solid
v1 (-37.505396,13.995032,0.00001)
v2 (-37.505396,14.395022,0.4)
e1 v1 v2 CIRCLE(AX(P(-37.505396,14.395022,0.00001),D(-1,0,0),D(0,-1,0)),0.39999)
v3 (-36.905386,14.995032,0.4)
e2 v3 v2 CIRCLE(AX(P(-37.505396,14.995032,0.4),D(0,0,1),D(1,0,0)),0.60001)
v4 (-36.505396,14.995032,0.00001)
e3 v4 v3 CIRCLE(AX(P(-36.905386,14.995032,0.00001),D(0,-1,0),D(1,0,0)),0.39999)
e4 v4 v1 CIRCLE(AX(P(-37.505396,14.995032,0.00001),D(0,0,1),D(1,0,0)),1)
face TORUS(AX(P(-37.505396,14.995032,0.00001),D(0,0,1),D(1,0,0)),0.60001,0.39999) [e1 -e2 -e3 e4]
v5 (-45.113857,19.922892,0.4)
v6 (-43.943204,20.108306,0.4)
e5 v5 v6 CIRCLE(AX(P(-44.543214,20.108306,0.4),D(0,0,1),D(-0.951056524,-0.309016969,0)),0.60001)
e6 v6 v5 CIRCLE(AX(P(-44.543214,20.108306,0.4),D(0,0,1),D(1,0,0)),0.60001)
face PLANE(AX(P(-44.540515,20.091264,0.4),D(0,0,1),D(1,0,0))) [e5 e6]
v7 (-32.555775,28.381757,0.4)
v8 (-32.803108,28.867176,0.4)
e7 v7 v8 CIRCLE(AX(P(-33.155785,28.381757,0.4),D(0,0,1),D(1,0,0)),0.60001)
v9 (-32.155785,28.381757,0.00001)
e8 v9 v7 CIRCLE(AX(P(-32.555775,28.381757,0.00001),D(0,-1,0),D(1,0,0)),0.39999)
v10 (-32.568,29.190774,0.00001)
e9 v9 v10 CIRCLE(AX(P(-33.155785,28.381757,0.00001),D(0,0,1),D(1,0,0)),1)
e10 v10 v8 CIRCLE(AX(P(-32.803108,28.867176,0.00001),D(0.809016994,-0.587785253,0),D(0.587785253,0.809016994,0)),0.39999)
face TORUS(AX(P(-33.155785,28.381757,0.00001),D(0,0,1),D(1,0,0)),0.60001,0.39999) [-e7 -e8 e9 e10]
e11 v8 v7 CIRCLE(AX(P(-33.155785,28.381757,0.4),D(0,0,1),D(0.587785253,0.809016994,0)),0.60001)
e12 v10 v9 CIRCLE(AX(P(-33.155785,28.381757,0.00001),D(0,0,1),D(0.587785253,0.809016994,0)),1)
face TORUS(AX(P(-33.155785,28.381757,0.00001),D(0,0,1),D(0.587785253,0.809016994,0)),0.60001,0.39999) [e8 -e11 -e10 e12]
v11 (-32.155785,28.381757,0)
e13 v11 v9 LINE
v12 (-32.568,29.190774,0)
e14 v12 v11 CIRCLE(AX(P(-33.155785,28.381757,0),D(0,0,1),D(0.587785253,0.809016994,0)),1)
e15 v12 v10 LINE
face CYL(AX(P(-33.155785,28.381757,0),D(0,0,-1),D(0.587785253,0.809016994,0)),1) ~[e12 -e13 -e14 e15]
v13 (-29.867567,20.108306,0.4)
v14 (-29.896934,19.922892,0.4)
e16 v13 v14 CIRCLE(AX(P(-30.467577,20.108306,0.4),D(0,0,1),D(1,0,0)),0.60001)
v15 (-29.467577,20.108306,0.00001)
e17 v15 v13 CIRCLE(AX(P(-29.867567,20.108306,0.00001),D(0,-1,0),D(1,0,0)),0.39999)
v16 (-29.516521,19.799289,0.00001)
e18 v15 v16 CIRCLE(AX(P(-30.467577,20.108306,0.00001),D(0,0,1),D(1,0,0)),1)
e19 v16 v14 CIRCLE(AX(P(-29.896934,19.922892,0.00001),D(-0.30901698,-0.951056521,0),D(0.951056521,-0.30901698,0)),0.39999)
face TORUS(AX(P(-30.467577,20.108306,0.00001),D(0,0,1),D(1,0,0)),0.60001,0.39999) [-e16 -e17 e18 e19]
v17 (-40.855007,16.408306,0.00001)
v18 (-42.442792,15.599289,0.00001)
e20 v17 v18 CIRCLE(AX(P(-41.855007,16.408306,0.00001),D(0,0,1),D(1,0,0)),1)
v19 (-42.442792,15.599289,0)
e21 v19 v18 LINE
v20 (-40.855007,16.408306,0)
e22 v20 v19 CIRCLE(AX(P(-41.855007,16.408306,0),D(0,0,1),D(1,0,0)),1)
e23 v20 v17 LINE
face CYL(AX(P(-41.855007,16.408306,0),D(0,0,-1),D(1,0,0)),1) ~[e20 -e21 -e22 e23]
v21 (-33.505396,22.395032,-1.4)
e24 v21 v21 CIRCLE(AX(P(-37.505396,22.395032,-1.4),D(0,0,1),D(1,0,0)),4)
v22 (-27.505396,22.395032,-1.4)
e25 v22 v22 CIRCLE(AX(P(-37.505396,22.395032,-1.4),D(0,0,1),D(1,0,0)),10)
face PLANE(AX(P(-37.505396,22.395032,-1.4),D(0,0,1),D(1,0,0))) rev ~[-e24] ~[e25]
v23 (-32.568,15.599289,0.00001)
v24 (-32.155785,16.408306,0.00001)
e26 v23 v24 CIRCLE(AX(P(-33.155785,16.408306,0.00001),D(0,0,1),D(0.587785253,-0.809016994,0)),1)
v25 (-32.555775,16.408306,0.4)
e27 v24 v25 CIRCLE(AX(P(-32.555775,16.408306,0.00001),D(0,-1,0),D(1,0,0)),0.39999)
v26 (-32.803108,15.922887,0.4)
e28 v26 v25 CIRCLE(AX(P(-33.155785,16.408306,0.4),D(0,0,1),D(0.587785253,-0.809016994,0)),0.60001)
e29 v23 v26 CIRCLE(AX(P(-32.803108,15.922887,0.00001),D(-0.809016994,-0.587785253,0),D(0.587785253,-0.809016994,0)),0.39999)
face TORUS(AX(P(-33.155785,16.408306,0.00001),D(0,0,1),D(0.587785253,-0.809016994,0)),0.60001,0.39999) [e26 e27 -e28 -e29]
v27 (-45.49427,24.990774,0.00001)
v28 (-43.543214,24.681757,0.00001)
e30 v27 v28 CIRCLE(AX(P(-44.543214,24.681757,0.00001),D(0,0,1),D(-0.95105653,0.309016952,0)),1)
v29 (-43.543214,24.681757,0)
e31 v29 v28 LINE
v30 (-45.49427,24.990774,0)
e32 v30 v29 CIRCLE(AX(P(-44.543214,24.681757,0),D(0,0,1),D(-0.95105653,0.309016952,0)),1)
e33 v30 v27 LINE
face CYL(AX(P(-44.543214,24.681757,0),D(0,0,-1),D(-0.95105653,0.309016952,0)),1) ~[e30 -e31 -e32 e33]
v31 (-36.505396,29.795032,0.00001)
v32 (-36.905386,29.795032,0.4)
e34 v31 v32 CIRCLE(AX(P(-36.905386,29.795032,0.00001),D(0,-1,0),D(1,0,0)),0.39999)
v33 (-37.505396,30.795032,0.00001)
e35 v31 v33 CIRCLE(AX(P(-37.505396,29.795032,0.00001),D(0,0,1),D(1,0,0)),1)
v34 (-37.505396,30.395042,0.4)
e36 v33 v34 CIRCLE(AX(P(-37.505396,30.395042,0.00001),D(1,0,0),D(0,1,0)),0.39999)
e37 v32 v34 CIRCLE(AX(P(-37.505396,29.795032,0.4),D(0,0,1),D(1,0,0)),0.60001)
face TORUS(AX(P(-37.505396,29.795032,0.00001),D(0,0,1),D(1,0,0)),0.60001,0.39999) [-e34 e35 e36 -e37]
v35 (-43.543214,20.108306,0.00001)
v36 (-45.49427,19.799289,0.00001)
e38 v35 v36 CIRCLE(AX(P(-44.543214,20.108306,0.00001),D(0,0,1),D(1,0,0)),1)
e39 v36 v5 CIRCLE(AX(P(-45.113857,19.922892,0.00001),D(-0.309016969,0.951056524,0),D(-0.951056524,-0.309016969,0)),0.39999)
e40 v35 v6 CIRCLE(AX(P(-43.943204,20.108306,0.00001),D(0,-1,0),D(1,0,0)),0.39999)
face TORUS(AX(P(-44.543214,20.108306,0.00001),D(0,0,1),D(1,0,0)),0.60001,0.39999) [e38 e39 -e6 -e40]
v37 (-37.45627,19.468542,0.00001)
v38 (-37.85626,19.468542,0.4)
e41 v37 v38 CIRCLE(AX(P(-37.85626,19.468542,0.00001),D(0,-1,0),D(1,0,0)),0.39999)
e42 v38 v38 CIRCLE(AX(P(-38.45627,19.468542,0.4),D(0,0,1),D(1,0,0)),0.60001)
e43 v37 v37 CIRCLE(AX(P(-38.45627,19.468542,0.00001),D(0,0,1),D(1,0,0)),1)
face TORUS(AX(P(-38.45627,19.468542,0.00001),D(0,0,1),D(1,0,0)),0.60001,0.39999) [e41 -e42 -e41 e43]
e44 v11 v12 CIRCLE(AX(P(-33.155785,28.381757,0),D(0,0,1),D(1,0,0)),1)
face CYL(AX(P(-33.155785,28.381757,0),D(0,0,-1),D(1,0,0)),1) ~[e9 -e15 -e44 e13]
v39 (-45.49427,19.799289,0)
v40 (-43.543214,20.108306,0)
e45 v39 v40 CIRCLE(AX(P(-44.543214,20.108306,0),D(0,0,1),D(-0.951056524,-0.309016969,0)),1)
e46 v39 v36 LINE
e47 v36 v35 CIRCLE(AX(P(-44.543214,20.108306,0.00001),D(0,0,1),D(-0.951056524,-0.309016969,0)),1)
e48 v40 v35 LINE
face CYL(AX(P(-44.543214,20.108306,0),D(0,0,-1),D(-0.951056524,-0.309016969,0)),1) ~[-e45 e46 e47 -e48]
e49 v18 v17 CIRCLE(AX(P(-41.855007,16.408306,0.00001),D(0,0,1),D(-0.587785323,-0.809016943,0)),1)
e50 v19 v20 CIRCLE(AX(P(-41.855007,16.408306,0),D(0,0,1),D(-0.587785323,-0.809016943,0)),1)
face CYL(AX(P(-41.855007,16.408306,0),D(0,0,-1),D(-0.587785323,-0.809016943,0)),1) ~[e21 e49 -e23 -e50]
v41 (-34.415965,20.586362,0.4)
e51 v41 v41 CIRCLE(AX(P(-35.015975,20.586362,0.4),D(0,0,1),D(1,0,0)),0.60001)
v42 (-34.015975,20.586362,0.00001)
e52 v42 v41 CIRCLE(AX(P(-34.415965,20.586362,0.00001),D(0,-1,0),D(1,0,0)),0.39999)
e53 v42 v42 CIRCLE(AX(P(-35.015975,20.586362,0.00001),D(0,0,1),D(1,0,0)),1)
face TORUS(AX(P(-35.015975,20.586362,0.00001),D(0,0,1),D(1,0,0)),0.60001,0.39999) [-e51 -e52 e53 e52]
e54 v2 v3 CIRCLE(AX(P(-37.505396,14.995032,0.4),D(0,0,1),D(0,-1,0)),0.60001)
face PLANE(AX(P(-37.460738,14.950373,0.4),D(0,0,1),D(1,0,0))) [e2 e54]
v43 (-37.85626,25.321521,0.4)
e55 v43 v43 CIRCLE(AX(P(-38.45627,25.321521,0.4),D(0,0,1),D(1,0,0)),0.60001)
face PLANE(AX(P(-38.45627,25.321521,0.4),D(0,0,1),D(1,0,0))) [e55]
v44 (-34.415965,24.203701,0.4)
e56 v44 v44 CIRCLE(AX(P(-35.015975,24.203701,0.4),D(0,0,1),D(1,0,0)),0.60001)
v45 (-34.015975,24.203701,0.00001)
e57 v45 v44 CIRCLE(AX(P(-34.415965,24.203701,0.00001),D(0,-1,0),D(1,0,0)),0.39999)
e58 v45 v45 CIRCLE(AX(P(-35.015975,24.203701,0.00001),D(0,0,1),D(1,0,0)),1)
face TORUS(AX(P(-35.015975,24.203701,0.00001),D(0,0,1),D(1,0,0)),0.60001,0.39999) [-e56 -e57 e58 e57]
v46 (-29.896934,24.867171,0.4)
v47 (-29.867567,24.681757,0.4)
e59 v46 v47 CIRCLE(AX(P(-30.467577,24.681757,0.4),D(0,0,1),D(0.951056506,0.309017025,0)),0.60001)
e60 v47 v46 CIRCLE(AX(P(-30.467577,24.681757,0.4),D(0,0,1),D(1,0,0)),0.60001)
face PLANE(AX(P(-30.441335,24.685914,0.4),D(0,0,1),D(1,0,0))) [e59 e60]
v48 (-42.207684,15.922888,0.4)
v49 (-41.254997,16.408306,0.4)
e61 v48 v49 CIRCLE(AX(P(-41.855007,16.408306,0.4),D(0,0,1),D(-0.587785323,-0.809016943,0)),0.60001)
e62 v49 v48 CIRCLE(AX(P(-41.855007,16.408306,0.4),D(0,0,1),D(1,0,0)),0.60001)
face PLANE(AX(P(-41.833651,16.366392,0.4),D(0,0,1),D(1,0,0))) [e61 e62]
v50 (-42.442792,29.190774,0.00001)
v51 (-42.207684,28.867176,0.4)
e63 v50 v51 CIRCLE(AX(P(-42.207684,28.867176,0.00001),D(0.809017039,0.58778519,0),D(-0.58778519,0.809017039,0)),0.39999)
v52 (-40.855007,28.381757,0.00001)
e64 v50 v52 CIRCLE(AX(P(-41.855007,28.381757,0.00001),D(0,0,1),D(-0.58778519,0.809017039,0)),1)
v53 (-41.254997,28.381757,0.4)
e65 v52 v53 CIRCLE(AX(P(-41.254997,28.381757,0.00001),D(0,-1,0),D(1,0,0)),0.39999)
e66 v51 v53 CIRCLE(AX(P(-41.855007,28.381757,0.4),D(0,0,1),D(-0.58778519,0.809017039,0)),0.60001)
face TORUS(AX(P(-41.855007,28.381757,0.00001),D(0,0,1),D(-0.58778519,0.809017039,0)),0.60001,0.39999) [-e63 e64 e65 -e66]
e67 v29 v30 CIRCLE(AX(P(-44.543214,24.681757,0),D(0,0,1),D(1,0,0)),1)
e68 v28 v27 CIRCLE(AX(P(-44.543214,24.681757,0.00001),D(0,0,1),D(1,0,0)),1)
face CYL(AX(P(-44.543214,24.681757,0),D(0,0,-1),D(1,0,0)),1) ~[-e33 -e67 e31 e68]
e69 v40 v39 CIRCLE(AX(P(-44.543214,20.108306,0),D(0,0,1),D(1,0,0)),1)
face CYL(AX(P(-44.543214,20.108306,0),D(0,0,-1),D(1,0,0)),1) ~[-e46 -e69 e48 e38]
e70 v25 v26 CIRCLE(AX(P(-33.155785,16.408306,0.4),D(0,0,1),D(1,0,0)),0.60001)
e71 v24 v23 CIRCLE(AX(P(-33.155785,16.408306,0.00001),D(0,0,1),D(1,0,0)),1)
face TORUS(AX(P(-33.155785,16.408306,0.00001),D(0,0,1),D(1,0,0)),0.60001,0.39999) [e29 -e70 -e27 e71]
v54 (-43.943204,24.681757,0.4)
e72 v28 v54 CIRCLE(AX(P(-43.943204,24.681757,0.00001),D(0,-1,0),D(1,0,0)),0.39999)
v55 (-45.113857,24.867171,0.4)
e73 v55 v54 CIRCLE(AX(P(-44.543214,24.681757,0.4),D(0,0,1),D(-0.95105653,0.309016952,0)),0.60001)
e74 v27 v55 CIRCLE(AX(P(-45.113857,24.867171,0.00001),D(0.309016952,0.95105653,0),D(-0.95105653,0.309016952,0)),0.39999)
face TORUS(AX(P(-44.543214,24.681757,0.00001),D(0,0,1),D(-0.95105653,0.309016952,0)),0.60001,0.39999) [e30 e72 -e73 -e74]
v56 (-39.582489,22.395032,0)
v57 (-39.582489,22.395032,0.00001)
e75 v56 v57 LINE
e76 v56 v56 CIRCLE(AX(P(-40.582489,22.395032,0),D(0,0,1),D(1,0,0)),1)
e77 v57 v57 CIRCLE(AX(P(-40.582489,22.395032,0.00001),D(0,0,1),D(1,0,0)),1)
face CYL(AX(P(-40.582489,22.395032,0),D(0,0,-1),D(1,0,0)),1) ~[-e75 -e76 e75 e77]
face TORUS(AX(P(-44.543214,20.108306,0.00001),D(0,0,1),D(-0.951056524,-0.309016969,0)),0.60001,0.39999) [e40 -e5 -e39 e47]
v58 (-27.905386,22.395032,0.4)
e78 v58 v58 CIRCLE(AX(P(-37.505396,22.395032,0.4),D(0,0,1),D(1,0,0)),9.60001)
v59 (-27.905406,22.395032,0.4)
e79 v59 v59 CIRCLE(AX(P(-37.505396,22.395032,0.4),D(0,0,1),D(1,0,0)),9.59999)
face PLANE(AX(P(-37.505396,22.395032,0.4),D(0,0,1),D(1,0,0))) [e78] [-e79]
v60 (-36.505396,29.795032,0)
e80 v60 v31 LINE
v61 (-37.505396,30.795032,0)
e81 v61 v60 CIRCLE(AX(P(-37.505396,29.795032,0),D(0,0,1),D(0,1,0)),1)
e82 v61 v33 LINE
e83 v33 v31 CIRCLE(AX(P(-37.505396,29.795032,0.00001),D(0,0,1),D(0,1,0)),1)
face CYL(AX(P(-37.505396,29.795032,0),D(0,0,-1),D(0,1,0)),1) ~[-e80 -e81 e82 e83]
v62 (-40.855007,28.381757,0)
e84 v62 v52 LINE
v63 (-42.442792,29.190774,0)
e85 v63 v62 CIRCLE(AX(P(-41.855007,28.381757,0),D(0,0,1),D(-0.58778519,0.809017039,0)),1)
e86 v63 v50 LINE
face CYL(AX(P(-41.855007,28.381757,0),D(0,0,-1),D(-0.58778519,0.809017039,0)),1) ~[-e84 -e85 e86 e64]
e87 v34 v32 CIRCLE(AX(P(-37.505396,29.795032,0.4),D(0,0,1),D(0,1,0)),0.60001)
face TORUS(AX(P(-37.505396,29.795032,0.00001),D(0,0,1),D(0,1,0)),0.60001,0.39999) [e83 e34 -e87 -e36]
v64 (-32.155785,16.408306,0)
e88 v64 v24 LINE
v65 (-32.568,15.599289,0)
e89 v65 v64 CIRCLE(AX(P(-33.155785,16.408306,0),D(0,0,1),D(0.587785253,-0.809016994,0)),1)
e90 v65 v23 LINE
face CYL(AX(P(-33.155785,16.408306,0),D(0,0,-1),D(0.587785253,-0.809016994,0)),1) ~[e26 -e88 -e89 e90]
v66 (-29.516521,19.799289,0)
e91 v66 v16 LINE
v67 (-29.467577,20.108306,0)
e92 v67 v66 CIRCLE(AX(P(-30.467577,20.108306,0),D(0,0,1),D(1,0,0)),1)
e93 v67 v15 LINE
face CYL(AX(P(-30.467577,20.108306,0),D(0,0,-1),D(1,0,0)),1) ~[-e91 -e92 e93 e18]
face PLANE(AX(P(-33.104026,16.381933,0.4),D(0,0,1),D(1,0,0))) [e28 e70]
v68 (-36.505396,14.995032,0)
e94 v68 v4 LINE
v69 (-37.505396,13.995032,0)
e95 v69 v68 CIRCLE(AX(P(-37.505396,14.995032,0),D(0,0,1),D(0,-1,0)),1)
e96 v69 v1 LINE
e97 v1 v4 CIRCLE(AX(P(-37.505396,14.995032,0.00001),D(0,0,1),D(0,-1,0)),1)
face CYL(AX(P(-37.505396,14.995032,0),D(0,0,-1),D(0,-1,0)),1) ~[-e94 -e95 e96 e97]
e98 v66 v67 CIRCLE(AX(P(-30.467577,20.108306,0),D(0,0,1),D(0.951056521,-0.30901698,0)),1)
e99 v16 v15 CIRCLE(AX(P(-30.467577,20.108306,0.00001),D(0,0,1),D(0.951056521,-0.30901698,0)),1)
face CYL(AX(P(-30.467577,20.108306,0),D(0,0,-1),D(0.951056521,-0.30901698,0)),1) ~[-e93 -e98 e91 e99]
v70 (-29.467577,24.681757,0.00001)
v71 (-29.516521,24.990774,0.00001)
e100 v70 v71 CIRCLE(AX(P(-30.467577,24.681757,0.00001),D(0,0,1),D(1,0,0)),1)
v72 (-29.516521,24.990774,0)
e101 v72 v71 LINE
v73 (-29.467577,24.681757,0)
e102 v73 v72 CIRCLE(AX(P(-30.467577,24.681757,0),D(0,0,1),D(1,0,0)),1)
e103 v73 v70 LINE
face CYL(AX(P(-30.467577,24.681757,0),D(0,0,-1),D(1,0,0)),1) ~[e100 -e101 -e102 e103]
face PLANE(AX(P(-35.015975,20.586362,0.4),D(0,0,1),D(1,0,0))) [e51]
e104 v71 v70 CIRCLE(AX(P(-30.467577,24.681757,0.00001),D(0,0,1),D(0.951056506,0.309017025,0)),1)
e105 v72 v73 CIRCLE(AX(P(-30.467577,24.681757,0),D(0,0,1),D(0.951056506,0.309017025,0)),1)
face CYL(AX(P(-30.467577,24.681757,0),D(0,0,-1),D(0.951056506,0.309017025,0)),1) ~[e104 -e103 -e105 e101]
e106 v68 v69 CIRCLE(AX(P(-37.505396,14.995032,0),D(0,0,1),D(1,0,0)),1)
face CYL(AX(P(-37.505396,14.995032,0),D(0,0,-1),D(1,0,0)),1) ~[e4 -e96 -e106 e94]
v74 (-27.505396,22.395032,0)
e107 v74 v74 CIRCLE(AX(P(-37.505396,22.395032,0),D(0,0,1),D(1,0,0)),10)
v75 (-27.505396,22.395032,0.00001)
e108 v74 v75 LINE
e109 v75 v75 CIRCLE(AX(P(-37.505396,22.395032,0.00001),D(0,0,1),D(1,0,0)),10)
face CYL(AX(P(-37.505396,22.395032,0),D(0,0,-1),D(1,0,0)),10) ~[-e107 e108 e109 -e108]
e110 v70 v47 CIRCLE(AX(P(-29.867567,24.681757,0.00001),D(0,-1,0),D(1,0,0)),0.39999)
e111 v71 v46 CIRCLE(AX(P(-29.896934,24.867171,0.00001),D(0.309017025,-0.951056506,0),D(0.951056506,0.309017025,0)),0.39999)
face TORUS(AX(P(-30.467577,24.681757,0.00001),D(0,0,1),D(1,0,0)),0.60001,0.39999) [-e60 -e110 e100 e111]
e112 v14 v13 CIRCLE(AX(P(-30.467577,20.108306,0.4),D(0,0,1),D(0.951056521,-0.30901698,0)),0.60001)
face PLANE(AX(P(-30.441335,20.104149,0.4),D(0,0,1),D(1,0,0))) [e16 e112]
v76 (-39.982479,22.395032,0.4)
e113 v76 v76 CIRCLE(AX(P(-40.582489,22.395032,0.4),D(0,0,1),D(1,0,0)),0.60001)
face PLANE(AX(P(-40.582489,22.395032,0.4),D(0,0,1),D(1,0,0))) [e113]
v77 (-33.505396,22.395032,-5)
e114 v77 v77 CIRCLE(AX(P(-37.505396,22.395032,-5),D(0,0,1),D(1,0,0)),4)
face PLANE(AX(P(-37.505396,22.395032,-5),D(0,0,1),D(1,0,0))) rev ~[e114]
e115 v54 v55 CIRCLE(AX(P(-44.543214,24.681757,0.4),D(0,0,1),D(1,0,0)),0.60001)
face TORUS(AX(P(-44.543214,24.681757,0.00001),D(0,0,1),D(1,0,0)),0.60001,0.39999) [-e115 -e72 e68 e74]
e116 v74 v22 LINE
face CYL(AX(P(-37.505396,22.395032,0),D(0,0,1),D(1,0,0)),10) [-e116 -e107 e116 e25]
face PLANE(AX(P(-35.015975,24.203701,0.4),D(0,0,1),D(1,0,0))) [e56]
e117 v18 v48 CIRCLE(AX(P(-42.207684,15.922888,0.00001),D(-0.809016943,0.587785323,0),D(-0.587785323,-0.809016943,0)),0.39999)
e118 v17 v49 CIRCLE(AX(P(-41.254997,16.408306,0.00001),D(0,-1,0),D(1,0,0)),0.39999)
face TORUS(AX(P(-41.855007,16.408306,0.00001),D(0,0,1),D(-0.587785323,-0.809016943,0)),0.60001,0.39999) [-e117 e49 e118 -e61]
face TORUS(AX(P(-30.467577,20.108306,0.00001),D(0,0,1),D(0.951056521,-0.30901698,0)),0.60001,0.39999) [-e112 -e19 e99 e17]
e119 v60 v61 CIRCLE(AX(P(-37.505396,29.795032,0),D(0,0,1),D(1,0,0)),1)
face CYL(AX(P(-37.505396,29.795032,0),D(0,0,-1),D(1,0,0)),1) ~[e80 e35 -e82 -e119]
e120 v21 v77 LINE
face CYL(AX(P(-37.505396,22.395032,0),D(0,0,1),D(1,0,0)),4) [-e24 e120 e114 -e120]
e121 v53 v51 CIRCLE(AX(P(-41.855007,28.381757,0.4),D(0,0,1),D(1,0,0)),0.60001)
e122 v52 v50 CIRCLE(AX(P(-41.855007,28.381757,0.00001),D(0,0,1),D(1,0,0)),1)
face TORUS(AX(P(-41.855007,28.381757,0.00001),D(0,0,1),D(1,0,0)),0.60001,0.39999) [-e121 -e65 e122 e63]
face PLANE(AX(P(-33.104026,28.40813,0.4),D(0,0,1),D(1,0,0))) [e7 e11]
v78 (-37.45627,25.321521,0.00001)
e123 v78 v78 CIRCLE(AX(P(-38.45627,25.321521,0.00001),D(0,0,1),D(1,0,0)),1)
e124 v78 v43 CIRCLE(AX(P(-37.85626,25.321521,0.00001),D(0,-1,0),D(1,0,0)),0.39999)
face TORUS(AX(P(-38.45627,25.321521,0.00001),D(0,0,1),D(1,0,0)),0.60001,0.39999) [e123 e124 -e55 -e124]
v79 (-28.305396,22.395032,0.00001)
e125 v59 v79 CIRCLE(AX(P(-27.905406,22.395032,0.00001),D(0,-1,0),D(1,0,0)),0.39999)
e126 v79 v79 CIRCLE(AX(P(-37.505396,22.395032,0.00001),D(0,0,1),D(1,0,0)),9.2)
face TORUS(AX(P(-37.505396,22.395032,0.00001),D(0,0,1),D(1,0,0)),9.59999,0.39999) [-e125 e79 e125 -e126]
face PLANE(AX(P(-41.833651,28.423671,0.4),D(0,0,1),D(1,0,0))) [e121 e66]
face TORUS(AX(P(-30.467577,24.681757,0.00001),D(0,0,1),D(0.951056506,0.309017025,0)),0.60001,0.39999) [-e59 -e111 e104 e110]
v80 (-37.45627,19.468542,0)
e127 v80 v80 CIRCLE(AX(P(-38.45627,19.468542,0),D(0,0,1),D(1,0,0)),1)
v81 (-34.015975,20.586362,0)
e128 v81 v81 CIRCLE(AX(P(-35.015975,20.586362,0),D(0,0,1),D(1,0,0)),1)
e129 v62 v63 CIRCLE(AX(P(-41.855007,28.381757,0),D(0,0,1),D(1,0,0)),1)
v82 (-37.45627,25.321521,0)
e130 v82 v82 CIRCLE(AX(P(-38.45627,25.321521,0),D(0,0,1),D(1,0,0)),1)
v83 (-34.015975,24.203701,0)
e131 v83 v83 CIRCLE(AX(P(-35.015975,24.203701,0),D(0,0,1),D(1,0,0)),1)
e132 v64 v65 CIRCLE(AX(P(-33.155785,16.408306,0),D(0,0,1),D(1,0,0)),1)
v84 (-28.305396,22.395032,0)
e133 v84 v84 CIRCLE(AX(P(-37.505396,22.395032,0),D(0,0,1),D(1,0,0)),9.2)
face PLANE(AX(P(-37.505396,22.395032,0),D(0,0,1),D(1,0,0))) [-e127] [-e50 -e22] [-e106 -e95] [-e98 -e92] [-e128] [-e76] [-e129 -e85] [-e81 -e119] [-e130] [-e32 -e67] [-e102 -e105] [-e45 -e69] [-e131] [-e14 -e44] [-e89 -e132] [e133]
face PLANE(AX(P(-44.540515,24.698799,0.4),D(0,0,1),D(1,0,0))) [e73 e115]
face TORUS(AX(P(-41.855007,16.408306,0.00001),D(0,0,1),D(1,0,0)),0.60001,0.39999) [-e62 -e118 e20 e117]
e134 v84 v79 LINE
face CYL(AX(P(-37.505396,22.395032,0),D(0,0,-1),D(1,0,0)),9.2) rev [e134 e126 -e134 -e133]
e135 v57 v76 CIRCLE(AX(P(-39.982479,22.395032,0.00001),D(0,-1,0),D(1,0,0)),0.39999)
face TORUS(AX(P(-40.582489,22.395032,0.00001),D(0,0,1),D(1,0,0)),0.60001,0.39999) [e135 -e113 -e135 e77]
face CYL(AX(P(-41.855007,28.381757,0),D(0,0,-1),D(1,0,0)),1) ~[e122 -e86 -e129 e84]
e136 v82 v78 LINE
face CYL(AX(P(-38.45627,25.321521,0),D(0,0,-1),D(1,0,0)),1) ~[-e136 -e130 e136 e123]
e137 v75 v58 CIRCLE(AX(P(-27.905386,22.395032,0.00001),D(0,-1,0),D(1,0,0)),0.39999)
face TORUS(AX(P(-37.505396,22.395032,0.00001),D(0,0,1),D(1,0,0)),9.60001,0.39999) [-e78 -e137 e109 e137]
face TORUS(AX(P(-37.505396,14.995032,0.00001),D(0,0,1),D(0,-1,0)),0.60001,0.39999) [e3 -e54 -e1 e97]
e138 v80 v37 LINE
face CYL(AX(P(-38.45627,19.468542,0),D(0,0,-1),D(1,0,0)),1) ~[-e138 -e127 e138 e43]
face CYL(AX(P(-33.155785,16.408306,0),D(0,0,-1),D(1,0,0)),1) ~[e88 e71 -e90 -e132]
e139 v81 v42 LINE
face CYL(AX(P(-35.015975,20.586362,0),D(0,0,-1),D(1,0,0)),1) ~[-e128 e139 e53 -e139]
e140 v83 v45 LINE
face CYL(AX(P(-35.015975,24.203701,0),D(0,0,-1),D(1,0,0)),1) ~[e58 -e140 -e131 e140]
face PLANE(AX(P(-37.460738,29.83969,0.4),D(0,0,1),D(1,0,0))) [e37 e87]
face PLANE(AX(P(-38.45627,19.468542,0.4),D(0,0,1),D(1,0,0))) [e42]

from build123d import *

# Parameters (mm, degrees)
F0_R     = 10
F0_R_2   = 4
F1_DEPTH = 1.4
F2_DEPTH = 5
F3_R     = 10
F3_R_2   = 9.2
F3_R_3   = 1
F4_DEPTH = 0.4
F5_R     = 0.39999


# Not quite as in the source:
# - a fillet or chamfer is up to 0.001 mm smaller than in the source, because OpenCascade refuses the exact size


with BuildPart() as f1:
    # F0 (on Top) → F1 (new body)
    with BuildSketch(Plane.XY):
        with Locations((-37.5053957105, 22.3950315267)):
            Circle(F0_R)
        with Locations((-37.5053957105, 22.3950315267)):
            Circle(F0_R_2, mode=Mode.SUBTRACT)
        with Locations((-37.5053957105, 22.3950315267)):
            Circle(F0_R_2)
    extrude(amount=-F1_DEPTH)

    # F0 (on Top) → F2 (join)
    with BuildSketch(Plane.XY):
        with Locations((-37.5053957105, 22.3950315267)):
            Circle(F0_R_2)
    extrude(amount=-F2_DEPTH)

    # F3 (on face) → F4 (join)
    with BuildSketch(Plane.XY):
        with Locations((-37.5053957105, 22.3950315267)):
            Circle(F3_R)
        with Locations((-37.5053957105, 22.3950315267)):
            Circle(F3_R_2, mode=Mode.SUBTRACT)
        with BuildLine():
            ThreePointArc((-43.5432139311, 24.6817572851), (-44.3867794879, 25.6694456291), (-45.4942704611, 24.9907742372))
            ThreePointArc((-45.4942704611, 24.9907742372), (-44.6996483742, 23.694068941), (-43.5432139311, 24.6817572851))
        make_face()
        with BuildLine():
            ThreePointArc((-43.5432139311, 20.1083057683), (-44.6996483831, 21.095994111), (-45.4942704555, 19.799288799))
            ThreePointArc((-45.4942704555, 19.799288799), (-44.386779479, 19.1206174257), (-43.5432139311, 20.1083057683))
        make_face()
        with BuildLine():
            ThreePointArc((-40.8550065774, 16.4083057683), (-42.3089970383, 17.2993123123), (-42.4427919004, 15.5992888253))
            ThreePointArc((-42.4427919004, 15.5992888253), (-41.4010161166, 15.5172992243), (-40.8550065774, 16.4083057683))
        make_face()
        with BuildLine():
            ThreePointArc((-37.5053957105, 30.7950315267), (-38.2125024917, 29.0879247455), (-36.5053957105, 29.7950315267))
            ThreePointArc((-36.5053957105, 29.7950315267), (-36.7982889293, 30.5021383079), (-37.5053957105, 30.7950315267))
        make_face()
        with BuildLine():
            ThreePointArc((-40.8550065774, 28.3817572851), (-41.4010160436, 29.2727637919), (-42.4427917678, 29.1907743244))
            ThreePointArc((-42.4427917678, 29.1907743244), (-42.3089971113, 27.4907507782), (-40.8550065774, 28.3817572851))
        make_face()
        with BuildLine():
            ThreePointArc((-36.5053957105, 14.9950315267), (-38.2125024917, 15.7021383079), (-37.5053957105, 13.9950315267))
            ThreePointArc((-37.5053957105, 13.9950315267), (-36.7982889293, 14.2879247455), (-36.5053957105, 14.9950315267))
        make_face()
        with BuildLine():
            ThreePointArc((-32.1557848435, 16.4083057683), (-34.0467913678, 16.8622962678), (-32.5679995907, 15.5992887743))
            ThreePointArc((-32.5679995907, 15.5992887743), (-32.2647783192, 15.9543152688), (-32.1557848435, 16.4083057683))
        make_face()
        with BuildLine():
            ThreePointArc((-29.4675774899, 20.1083057683), (-31.4552658317, 20.2647402258), (-29.5165209689, 19.7992887885))
            ThreePointArc((-29.5165209689, 19.7992887885), (-29.4798891481, 19.9518713108), (-29.4675774899, 20.1083057683))
        make_face()
        with BuildLine():
            ThreePointArc((-29.4675774899, 24.6817572851), (-29.4798891518, 24.8381917658), (-29.5165209834, 24.9907743097))
            ThreePointArc((-29.5165209834, 24.9907743097), (-31.455265828, 24.5253228043), (-29.4675774899, 24.6817572851))
        make_face()
        with BuildLine():
            ThreePointArc((-32.1557848435, 28.3817572851), (-32.2647783192, 28.8357477845), (-32.5679995907, 29.1907742791))
            ThreePointArc((-32.5679995907, 29.1907742791), (-34.0467913678, 27.9277667856), (-32.1557848435, 28.3817572851))
        make_face()
        with Locations((-38.4562697482, 25.3215208985)):
            Circle(F3_R_3)
        with Locations((-40.5824887346, 22.3950315267)):
            Circle(F3_R_3)
        with Locations((-38.4562697482, 19.4685421549)):
            Circle(F3_R_3)
        with Locations((-35.0159751607, 20.5863616272)):
            Circle(F3_R_3)
        with Locations((-35.0159751607, 24.2037014262)):
            Circle(F3_R_3)
    extrude(amount=F4_DEPTH)

    # F5 (radius 0.4 in the source; OpenCascade refuses exactly that, so slightly less here)
    f5_edges = [f1.edges().sort_by_distance(p)[0] for p in [
        (-43.592157, 24.37274, 0.4),
        (-43.592157, 20.417323, 0.4),
        (-41.267221, 17.217323, 0.4),
        (-39.45627, 19.468542, 0.4),
        (-41.582489, 22.395032, 0.4),
        (-36.015975, 20.586362, 0.4),
        (-37.505396, 15.995032, 0.4),
        (-33.74357, 17.217323, 0.4),
        (-31.418634, 20.417323, 0.4),
        (-31.418634, 24.37274, 0.4),
        (-36.015975, 24.203701, 0.4),
        (-39.45627, 25.321521, 0.4),
        (-41.267221, 27.57274, 0.4),
        (-38.505396, 29.795032, 0.4),
        (-33.74357, 27.57274, 0.4),
        (-46.705396, 22.395032, 0.4),
        (-47.505396, 22.395032, 0.4),
    ]]
    fillet(f5_edges, radius=F5_R)


solid = f1.part
